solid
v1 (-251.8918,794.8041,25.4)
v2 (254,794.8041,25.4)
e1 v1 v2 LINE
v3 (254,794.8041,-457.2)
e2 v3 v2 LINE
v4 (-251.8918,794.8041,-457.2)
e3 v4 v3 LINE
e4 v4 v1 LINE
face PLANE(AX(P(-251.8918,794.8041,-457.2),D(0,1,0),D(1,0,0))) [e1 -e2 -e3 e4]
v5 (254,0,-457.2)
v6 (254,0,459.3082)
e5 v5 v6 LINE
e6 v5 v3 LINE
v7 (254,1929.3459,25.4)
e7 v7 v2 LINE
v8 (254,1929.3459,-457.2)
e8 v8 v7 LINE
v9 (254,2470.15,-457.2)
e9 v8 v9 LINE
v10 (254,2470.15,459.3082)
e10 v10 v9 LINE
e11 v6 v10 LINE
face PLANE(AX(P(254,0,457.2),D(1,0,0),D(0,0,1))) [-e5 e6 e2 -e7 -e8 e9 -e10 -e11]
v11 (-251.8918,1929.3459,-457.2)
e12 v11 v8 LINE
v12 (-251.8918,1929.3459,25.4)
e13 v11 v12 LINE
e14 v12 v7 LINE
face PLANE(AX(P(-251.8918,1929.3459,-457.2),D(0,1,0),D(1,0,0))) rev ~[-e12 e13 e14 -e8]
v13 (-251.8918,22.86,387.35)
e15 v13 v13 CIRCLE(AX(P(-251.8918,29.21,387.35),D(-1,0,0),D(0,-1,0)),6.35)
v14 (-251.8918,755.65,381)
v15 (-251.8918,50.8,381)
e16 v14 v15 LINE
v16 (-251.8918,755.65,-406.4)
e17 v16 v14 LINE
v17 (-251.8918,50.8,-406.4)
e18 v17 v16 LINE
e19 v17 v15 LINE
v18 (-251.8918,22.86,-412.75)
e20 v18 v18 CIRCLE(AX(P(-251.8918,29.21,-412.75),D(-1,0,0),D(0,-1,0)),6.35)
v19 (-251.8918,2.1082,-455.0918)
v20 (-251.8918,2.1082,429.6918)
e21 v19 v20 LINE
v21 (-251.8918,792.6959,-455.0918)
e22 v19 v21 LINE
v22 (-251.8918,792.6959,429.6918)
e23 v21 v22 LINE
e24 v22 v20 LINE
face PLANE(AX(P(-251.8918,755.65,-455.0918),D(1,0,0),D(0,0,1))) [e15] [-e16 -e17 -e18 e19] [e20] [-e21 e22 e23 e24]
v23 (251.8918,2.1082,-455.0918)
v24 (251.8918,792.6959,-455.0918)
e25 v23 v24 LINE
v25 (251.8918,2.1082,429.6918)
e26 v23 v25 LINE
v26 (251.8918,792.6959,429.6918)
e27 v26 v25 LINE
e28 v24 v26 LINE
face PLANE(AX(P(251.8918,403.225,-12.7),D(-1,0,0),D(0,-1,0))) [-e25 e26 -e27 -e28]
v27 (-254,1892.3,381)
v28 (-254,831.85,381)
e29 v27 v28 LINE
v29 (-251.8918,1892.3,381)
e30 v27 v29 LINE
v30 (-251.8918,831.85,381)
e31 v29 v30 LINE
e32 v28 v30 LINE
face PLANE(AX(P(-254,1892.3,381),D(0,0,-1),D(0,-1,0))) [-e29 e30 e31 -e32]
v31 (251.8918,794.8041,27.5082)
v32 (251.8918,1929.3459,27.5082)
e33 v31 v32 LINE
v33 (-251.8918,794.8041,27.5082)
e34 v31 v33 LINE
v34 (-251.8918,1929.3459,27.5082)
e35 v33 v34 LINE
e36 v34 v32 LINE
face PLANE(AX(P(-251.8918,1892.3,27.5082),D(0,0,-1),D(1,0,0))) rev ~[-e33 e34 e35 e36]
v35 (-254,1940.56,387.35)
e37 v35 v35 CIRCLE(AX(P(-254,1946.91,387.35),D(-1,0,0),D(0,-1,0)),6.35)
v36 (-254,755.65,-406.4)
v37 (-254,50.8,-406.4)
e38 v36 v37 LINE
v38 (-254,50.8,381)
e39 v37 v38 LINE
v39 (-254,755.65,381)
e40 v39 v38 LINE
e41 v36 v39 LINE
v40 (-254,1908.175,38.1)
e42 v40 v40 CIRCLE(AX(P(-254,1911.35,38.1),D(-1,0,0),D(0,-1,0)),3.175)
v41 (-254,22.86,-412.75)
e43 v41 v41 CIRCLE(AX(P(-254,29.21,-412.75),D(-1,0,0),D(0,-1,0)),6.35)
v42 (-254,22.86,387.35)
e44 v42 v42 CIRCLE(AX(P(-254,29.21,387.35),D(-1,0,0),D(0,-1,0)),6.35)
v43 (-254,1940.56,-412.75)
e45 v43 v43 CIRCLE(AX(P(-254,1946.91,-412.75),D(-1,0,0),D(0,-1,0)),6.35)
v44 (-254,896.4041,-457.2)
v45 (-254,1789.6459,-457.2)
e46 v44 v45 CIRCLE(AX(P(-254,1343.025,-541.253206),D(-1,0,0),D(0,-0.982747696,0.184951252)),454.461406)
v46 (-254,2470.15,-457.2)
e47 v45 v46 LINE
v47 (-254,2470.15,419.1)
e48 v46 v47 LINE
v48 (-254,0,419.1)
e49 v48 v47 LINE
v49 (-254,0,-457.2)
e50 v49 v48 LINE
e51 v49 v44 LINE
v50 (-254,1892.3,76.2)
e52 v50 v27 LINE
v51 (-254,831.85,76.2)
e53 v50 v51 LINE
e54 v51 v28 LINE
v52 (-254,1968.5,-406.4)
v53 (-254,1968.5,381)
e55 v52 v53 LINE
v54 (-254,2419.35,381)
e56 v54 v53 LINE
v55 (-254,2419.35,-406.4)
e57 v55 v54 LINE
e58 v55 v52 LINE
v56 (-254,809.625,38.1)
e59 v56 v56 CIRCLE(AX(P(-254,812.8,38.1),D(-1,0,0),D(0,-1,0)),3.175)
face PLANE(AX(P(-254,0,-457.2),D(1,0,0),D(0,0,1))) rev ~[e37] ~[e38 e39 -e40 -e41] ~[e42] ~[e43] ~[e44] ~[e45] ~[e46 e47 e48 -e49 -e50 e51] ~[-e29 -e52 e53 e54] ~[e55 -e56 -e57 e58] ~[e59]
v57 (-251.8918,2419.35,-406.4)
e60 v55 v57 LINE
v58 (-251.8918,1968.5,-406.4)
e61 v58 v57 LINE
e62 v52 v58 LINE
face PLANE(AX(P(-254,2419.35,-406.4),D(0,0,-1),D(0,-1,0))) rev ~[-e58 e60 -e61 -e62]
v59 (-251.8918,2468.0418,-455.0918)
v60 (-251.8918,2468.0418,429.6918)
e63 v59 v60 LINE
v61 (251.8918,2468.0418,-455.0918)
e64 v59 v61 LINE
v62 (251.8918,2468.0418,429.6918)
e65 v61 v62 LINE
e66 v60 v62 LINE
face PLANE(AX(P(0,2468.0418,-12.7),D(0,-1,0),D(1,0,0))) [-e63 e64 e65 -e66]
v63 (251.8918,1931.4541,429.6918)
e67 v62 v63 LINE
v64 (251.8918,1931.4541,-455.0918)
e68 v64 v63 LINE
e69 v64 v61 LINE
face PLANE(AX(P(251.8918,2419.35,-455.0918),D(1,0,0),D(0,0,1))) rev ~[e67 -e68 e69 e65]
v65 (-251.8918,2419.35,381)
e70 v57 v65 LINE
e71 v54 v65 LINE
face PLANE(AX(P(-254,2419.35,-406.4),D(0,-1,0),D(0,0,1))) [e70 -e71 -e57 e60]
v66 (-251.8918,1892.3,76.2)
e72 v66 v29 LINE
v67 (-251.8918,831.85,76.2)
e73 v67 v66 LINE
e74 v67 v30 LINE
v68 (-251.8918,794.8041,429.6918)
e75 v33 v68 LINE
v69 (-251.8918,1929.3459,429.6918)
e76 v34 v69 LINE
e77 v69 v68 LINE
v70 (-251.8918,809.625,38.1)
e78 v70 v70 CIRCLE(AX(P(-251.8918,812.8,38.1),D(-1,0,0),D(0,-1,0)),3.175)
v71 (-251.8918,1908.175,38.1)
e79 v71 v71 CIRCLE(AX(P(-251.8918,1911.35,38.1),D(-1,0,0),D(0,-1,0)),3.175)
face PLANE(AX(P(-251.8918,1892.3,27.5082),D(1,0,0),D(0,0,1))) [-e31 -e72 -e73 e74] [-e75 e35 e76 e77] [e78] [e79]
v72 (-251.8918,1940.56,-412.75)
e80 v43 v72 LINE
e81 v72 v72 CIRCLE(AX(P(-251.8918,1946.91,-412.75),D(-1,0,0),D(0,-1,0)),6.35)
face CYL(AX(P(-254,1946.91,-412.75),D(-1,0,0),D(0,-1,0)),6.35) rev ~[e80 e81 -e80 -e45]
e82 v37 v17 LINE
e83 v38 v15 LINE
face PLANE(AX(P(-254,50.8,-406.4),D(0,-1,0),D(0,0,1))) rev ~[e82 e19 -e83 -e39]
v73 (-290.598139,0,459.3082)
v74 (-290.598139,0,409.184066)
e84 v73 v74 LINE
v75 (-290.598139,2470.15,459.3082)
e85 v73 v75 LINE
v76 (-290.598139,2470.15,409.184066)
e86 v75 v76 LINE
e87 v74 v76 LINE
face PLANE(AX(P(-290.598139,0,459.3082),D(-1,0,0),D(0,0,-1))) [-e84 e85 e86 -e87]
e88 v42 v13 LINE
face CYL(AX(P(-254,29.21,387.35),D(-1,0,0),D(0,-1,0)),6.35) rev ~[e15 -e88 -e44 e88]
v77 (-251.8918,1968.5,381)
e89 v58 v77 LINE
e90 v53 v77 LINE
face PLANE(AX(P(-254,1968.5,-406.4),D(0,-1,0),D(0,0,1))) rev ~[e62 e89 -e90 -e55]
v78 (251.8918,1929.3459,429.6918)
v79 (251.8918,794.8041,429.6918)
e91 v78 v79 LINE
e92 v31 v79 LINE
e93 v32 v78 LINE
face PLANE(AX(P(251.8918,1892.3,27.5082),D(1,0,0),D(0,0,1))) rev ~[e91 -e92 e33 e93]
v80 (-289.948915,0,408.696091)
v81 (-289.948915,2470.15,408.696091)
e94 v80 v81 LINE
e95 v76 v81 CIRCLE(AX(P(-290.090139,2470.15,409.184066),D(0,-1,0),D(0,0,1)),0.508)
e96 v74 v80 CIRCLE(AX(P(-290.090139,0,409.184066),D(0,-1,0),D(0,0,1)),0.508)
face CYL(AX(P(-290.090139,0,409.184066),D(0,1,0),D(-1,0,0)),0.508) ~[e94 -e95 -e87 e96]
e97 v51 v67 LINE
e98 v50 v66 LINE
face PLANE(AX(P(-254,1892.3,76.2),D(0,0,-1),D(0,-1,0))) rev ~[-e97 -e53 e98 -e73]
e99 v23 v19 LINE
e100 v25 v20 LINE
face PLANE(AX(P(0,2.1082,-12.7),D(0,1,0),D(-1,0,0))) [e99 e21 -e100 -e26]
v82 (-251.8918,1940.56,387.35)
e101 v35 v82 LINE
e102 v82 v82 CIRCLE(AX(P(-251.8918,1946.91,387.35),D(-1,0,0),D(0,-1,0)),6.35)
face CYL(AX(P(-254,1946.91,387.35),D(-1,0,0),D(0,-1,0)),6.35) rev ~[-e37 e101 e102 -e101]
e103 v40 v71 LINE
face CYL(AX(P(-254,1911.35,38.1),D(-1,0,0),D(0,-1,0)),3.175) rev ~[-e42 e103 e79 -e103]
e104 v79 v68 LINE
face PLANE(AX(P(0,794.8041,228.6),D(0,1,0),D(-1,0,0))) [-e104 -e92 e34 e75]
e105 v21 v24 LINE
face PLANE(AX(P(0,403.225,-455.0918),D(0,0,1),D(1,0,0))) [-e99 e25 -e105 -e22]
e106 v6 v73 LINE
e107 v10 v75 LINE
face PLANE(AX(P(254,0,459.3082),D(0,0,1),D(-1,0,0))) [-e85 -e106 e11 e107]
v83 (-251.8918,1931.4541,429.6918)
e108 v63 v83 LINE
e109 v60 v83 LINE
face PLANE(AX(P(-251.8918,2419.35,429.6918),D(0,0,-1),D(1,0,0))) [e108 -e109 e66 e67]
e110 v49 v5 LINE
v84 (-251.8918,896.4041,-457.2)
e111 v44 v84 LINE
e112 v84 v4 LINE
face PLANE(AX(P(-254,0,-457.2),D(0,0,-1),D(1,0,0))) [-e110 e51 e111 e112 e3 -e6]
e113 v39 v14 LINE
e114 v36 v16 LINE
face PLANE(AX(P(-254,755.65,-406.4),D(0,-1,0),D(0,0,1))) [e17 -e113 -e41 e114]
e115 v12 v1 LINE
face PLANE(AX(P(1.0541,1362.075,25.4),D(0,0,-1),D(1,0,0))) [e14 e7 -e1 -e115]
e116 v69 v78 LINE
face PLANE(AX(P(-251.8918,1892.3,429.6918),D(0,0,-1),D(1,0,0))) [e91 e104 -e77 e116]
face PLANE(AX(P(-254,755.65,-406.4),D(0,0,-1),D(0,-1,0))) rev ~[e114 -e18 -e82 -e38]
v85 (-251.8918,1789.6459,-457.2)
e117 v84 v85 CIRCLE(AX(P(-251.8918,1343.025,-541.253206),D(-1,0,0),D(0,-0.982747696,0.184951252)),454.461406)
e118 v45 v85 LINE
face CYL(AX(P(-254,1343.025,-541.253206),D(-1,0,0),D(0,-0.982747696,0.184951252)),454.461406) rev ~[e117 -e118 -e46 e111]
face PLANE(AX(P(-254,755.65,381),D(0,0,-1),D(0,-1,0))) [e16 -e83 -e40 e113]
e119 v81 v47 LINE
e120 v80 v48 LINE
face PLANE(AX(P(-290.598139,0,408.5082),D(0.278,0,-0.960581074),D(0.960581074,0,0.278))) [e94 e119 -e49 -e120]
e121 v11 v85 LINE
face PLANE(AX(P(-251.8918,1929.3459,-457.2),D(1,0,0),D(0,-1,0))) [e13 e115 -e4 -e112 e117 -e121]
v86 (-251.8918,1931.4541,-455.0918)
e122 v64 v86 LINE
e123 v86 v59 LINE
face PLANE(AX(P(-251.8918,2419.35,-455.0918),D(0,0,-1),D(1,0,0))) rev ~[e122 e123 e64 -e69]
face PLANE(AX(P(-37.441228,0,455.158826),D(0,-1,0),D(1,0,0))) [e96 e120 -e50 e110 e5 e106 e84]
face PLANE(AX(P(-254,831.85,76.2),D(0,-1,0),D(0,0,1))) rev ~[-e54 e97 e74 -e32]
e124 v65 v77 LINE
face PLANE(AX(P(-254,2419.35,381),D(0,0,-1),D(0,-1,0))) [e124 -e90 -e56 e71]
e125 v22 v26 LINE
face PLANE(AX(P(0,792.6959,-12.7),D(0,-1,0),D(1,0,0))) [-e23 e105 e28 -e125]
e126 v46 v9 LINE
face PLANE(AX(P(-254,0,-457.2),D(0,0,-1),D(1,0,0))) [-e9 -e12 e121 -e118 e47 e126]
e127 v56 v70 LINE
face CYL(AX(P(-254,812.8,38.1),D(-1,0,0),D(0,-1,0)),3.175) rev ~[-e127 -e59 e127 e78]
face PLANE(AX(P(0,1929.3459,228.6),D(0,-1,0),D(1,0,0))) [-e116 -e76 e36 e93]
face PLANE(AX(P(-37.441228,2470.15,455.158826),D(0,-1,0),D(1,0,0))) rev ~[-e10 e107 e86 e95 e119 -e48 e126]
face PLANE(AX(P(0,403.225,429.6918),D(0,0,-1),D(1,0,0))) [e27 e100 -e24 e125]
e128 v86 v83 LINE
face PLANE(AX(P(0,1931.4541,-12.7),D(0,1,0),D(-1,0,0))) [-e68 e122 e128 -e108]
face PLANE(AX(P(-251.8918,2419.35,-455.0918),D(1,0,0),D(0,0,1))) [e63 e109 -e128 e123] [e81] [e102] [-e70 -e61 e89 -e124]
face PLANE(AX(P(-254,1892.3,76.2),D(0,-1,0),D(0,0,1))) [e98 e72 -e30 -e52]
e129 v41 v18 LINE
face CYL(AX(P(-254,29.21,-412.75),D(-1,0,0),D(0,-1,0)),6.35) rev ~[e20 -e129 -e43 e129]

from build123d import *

# Parameters (mm, degrees)
F0_W      = 508
F0_H      = 914.4
F1_DEPTH  = 2470.15
F2_W      = 450.85
F2_H      = 787.4
F2_W_2    = 1060.45
F2_H_2    = 304.8
F2_W_3    = 704.85
F3_DEPTH  = 505.8918
F4_W      = 503.7836
F4_H      = 704.85
F5_DEPTH  = 48.6918
F6_W      = 503.7836
F6_H      = 704.85
F7_DEPTH  = 48.6918
F8_W      = 503.7836
F8_H      = 884.7836
F9_DEPTH  = 37.0459
F10_W     = 503.7836
F10_H     = 884.7836
F11_DEPTH = 48.6918
F12_W     = 503.7836
F12_H     = 1060.45
F13_DEPTH = 48.6918
F14_W     = 503.7836
F14_H     = 1060.45
F15_DEPTH = 48.6918
F16_W     = 503.7836
F16_H     = 402.1836
F17_DEPTH = 37.0459
F18_W     = 503.7836
F18_H     = 402.1836
F19_DEPTH = 37.0459
F20_W     = 503.7836
F20_H     = 450.85
F21_DEPTH = 48.6918
F22_W     = 503.7836
F22_H     = 450.85
F23_DEPTH = 48.6918
F24_W     = 503.7836
F24_H     = 884.7836
F25_DEPTH = 37.0459
F26_W     = 503.7836
F26_H     = 884.7836
F27_DEPTH = 48.6918
F28_W     = 505.8918
F28_H     = 1134.5418
F29_DEPTH = 482.6
F31_DEPTH = 508.001
F33_DEPTH = 2470.15
F34_R     = 0.508
F35_R     = 3.175
F36_DEPTH = 2.1082
F37_R     = 6.35
F38_DEPTH = 2.1082
F39_R     = 6.35
F40_DEPTH = 2.1082


# Not quite as in the source:
# - a feature names something its author has since deleted; it is built from what else it names


with BuildPart() as f1:
    # F0 (on Front) → F1 (new body)
    with BuildSketch(Plane.XZ):
        Rectangle(F0_W, F0_H)
    extrude(amount=-F1_DEPTH)

    # F2 (on face) → F3 (cut)
    with BuildSketch(Plane(origin=(-254, 0, 0), x_dir=(0, -1, 0), z_dir=(-1, 0, 0))):
        with Locations((-2193.925, -12.7)):
            Rectangle(F2_W, F2_H)
        with Locations((-1362.075, 228.6)):
            Rectangle(F2_W_2, F2_H_2)
        with Locations((-403.225, -12.7)):
            Rectangle(F2_W_3, F2_H)
    extrude(amount=-F3_DEPTH, mode=Mode.SUBTRACT)

    # F4 (on face) → F5 (cut)
    with BuildSketch(Plane.XY.offset(-406.4)):
        with Locations((0, 403.225)):
            Rectangle(F4_W, F4_H)
    extrude(amount=-F5_DEPTH, mode=Mode.SUBTRACT)

    # F6 (on face) → F7 (cut)
    with BuildSketch(Plane(origin=(0, 0, 381), x_dir=(1, 0, 0), z_dir=(0, 0, -1))):
        with Locations((0, -403.225)):
            Rectangle(F6_W, F6_H)
    extrude(amount=-F7_DEPTH, mode=Mode.SUBTRACT)

    # F8 (on face) → F9 (cut)
    with BuildSketch(Plane.XZ.offset(-755.65)):
        with Locations((0, -12.7)):
            Rectangle(F8_W, F8_H)
    extrude(amount=-F9_DEPTH, mode=Mode.SUBTRACT)

    # F10 (on face) → F11 (cut)
    with BuildSketch(Plane(origin=(0, 50.8, 0), x_dir=(-1, 0, 0), z_dir=(0, 1, 0))):
        with Locations((0, -12.7)):
            Rectangle(F10_W, F10_H)
    extrude(amount=-F11_DEPTH, mode=Mode.SUBTRACT)

    # F12 (on face) → F13 (cut)
    with BuildSketch(Plane.XY.offset(76.2)):
        with Locations((0, 1362.075)):
            Rectangle(F12_W, F12_H)
    extrude(amount=-F13_DEPTH, mode=Mode.SUBTRACT)

    # F14 (on face) → F15 (cut)
    with BuildSketch(Plane(origin=(0, 0, 381), x_dir=(1, 0, 0), z_dir=(0, 0, -1))):
        with Locations((0, -1362.075)):
            Rectangle(F14_W, F14_H)
    extrude(amount=-F15_DEPTH, mode=Mode.SUBTRACT)

    # F16 (on face) → F17 (cut)
    with BuildSketch(Plane(origin=(0, 831.85, 0), x_dir=(-1, 0, 0), z_dir=(0, 1, 0))):
        with Locations((0, 228.6)):
            Rectangle(F16_W, F16_H)
    extrude(amount=-F17_DEPTH, mode=Mode.SUBTRACT)

    # F18 (on face) → F19 (cut)
    with BuildSketch(Plane.XZ.offset(-1892.3)):
        with Locations((0, 228.6)):
            Rectangle(F18_W, F18_H)
    extrude(amount=-F19_DEPTH, mode=Mode.SUBTRACT)

    # F20 (on face) → F21 (cut)
    with BuildSketch(Plane.XY.offset(-406.4)):
        with Locations((0, 2193.925)):
            Rectangle(F20_W, F20_H)
    extrude(amount=-F21_DEPTH, mode=Mode.SUBTRACT)

    # F22 (on face) → F23 (cut)
    with BuildSketch(Plane(origin=(0, 0, 381), x_dir=(1, 0, 0), z_dir=(0, 0, -1))):
        with Locations((0, -2193.925)):
            Rectangle(F22_W, F22_H)
    extrude(amount=-F23_DEPTH, mode=Mode.SUBTRACT)

    # F24 (on face) → F25 (cut)
    with BuildSketch(Plane(origin=(0, 1968.5, 0), x_dir=(-1, 0, 0), z_dir=(0, 1, 0))):
        with Locations((0, -12.7)):
            Rectangle(F24_W, F24_H)
    extrude(amount=-F25_DEPTH, mode=Mode.SUBTRACT)

    # F26 (on face) → F27 (cut)
    with BuildSketch(Plane.XZ.offset(-2419.35)):
        with Locations((0, -12.7)):
            Rectangle(F26_W, F26_H)
    extrude(amount=-F27_DEPTH, mode=Mode.SUBTRACT)

    # F28 (on face) → F29 (cut)
    with BuildSketch(Plane(origin=(0, 0, -457.2), x_dir=(1, 0, 0), z_dir=(0, 0, -1))):
        with Locations((1.0541, -1362.075)):
            Rectangle(F28_W, F28_H)
    extrude(amount=-F29_DEPTH, mode=Mode.SUBTRACT)

    # F30 (on face) → F31 (cut, through all)
    with BuildSketch(Plane(origin=(-254, 0, 0), x_dir=(0, -1, 0), z_dir=(-1, 0, 0))):
        with BuildLine():
            Line((-1789.6459, -457.2), (-896.4041, -457.2))
            ThreePointArc((-896.4041, -457.2), (-1343.025, -86.7918), (-1789.6459, -457.2))
        make_face()
    extrude(amount=-F31_DEPTH, mode=Mode.SUBTRACT)

    # F32 (on face) → F33 (join, through all)
    with BuildSketch(Plane.XZ):
        Polygon((-290.5981389248, 459.3082), (-290.5981389248, 408.5082), (-254, 419.1), (-254, 457.2), (254, 457.2), (254, 459.3082), align=None)
    extrude(amount=-F33_DEPTH)

    # F34
    f34_edges = [f1.edges().sort_by_distance(p)[0] for p in [
        (-290.598139, 1235.075, 408.5082),
    ]]
    fillet(f34_edges, radius=F34_R)

    # F35 (on face) → F36 (cut, through all)
    with BuildSketch(Plane(origin=(-254, 0, 0), x_dir=(0, -1, 0), z_dir=(-1, 0, 0))):
        with Locations((-1911.35, 38.1)):
            Circle(F35_R)
        with Locations((-812.8, 38.1)):
            Circle(F35_R)
    extrude(amount=-F36_DEPTH, mode=Mode.SUBTRACT)

    # F37 (on face) → F38 (cut, through all)
    with BuildSketch(Plane(origin=(-254, 0, 0), x_dir=(0, -1, 0), z_dir=(-1, 0, 0))):
        with Locations((-29.21, 387.35)):
            Circle(F37_R)
        with Locations((-29.21, -412.75)):
            Circle(F37_R)
    extrude(amount=-F38_DEPTH, mode=Mode.SUBTRACT)

    # F39 (on face) → F40 (cut, through all)
    with BuildSketch(Plane(origin=(-254, 0, 0), x_dir=(0, -1, 0), z_dir=(-1, 0, 0))):
        with Locations((-1946.91, 387.35)):
            Circle(F39_R)
        with Locations((-1946.91, -412.75)):
            Circle(F39_R)
    extrude(amount=-F40_DEPTH, mode=Mode.SUBTRACT)


solid = f1.part
